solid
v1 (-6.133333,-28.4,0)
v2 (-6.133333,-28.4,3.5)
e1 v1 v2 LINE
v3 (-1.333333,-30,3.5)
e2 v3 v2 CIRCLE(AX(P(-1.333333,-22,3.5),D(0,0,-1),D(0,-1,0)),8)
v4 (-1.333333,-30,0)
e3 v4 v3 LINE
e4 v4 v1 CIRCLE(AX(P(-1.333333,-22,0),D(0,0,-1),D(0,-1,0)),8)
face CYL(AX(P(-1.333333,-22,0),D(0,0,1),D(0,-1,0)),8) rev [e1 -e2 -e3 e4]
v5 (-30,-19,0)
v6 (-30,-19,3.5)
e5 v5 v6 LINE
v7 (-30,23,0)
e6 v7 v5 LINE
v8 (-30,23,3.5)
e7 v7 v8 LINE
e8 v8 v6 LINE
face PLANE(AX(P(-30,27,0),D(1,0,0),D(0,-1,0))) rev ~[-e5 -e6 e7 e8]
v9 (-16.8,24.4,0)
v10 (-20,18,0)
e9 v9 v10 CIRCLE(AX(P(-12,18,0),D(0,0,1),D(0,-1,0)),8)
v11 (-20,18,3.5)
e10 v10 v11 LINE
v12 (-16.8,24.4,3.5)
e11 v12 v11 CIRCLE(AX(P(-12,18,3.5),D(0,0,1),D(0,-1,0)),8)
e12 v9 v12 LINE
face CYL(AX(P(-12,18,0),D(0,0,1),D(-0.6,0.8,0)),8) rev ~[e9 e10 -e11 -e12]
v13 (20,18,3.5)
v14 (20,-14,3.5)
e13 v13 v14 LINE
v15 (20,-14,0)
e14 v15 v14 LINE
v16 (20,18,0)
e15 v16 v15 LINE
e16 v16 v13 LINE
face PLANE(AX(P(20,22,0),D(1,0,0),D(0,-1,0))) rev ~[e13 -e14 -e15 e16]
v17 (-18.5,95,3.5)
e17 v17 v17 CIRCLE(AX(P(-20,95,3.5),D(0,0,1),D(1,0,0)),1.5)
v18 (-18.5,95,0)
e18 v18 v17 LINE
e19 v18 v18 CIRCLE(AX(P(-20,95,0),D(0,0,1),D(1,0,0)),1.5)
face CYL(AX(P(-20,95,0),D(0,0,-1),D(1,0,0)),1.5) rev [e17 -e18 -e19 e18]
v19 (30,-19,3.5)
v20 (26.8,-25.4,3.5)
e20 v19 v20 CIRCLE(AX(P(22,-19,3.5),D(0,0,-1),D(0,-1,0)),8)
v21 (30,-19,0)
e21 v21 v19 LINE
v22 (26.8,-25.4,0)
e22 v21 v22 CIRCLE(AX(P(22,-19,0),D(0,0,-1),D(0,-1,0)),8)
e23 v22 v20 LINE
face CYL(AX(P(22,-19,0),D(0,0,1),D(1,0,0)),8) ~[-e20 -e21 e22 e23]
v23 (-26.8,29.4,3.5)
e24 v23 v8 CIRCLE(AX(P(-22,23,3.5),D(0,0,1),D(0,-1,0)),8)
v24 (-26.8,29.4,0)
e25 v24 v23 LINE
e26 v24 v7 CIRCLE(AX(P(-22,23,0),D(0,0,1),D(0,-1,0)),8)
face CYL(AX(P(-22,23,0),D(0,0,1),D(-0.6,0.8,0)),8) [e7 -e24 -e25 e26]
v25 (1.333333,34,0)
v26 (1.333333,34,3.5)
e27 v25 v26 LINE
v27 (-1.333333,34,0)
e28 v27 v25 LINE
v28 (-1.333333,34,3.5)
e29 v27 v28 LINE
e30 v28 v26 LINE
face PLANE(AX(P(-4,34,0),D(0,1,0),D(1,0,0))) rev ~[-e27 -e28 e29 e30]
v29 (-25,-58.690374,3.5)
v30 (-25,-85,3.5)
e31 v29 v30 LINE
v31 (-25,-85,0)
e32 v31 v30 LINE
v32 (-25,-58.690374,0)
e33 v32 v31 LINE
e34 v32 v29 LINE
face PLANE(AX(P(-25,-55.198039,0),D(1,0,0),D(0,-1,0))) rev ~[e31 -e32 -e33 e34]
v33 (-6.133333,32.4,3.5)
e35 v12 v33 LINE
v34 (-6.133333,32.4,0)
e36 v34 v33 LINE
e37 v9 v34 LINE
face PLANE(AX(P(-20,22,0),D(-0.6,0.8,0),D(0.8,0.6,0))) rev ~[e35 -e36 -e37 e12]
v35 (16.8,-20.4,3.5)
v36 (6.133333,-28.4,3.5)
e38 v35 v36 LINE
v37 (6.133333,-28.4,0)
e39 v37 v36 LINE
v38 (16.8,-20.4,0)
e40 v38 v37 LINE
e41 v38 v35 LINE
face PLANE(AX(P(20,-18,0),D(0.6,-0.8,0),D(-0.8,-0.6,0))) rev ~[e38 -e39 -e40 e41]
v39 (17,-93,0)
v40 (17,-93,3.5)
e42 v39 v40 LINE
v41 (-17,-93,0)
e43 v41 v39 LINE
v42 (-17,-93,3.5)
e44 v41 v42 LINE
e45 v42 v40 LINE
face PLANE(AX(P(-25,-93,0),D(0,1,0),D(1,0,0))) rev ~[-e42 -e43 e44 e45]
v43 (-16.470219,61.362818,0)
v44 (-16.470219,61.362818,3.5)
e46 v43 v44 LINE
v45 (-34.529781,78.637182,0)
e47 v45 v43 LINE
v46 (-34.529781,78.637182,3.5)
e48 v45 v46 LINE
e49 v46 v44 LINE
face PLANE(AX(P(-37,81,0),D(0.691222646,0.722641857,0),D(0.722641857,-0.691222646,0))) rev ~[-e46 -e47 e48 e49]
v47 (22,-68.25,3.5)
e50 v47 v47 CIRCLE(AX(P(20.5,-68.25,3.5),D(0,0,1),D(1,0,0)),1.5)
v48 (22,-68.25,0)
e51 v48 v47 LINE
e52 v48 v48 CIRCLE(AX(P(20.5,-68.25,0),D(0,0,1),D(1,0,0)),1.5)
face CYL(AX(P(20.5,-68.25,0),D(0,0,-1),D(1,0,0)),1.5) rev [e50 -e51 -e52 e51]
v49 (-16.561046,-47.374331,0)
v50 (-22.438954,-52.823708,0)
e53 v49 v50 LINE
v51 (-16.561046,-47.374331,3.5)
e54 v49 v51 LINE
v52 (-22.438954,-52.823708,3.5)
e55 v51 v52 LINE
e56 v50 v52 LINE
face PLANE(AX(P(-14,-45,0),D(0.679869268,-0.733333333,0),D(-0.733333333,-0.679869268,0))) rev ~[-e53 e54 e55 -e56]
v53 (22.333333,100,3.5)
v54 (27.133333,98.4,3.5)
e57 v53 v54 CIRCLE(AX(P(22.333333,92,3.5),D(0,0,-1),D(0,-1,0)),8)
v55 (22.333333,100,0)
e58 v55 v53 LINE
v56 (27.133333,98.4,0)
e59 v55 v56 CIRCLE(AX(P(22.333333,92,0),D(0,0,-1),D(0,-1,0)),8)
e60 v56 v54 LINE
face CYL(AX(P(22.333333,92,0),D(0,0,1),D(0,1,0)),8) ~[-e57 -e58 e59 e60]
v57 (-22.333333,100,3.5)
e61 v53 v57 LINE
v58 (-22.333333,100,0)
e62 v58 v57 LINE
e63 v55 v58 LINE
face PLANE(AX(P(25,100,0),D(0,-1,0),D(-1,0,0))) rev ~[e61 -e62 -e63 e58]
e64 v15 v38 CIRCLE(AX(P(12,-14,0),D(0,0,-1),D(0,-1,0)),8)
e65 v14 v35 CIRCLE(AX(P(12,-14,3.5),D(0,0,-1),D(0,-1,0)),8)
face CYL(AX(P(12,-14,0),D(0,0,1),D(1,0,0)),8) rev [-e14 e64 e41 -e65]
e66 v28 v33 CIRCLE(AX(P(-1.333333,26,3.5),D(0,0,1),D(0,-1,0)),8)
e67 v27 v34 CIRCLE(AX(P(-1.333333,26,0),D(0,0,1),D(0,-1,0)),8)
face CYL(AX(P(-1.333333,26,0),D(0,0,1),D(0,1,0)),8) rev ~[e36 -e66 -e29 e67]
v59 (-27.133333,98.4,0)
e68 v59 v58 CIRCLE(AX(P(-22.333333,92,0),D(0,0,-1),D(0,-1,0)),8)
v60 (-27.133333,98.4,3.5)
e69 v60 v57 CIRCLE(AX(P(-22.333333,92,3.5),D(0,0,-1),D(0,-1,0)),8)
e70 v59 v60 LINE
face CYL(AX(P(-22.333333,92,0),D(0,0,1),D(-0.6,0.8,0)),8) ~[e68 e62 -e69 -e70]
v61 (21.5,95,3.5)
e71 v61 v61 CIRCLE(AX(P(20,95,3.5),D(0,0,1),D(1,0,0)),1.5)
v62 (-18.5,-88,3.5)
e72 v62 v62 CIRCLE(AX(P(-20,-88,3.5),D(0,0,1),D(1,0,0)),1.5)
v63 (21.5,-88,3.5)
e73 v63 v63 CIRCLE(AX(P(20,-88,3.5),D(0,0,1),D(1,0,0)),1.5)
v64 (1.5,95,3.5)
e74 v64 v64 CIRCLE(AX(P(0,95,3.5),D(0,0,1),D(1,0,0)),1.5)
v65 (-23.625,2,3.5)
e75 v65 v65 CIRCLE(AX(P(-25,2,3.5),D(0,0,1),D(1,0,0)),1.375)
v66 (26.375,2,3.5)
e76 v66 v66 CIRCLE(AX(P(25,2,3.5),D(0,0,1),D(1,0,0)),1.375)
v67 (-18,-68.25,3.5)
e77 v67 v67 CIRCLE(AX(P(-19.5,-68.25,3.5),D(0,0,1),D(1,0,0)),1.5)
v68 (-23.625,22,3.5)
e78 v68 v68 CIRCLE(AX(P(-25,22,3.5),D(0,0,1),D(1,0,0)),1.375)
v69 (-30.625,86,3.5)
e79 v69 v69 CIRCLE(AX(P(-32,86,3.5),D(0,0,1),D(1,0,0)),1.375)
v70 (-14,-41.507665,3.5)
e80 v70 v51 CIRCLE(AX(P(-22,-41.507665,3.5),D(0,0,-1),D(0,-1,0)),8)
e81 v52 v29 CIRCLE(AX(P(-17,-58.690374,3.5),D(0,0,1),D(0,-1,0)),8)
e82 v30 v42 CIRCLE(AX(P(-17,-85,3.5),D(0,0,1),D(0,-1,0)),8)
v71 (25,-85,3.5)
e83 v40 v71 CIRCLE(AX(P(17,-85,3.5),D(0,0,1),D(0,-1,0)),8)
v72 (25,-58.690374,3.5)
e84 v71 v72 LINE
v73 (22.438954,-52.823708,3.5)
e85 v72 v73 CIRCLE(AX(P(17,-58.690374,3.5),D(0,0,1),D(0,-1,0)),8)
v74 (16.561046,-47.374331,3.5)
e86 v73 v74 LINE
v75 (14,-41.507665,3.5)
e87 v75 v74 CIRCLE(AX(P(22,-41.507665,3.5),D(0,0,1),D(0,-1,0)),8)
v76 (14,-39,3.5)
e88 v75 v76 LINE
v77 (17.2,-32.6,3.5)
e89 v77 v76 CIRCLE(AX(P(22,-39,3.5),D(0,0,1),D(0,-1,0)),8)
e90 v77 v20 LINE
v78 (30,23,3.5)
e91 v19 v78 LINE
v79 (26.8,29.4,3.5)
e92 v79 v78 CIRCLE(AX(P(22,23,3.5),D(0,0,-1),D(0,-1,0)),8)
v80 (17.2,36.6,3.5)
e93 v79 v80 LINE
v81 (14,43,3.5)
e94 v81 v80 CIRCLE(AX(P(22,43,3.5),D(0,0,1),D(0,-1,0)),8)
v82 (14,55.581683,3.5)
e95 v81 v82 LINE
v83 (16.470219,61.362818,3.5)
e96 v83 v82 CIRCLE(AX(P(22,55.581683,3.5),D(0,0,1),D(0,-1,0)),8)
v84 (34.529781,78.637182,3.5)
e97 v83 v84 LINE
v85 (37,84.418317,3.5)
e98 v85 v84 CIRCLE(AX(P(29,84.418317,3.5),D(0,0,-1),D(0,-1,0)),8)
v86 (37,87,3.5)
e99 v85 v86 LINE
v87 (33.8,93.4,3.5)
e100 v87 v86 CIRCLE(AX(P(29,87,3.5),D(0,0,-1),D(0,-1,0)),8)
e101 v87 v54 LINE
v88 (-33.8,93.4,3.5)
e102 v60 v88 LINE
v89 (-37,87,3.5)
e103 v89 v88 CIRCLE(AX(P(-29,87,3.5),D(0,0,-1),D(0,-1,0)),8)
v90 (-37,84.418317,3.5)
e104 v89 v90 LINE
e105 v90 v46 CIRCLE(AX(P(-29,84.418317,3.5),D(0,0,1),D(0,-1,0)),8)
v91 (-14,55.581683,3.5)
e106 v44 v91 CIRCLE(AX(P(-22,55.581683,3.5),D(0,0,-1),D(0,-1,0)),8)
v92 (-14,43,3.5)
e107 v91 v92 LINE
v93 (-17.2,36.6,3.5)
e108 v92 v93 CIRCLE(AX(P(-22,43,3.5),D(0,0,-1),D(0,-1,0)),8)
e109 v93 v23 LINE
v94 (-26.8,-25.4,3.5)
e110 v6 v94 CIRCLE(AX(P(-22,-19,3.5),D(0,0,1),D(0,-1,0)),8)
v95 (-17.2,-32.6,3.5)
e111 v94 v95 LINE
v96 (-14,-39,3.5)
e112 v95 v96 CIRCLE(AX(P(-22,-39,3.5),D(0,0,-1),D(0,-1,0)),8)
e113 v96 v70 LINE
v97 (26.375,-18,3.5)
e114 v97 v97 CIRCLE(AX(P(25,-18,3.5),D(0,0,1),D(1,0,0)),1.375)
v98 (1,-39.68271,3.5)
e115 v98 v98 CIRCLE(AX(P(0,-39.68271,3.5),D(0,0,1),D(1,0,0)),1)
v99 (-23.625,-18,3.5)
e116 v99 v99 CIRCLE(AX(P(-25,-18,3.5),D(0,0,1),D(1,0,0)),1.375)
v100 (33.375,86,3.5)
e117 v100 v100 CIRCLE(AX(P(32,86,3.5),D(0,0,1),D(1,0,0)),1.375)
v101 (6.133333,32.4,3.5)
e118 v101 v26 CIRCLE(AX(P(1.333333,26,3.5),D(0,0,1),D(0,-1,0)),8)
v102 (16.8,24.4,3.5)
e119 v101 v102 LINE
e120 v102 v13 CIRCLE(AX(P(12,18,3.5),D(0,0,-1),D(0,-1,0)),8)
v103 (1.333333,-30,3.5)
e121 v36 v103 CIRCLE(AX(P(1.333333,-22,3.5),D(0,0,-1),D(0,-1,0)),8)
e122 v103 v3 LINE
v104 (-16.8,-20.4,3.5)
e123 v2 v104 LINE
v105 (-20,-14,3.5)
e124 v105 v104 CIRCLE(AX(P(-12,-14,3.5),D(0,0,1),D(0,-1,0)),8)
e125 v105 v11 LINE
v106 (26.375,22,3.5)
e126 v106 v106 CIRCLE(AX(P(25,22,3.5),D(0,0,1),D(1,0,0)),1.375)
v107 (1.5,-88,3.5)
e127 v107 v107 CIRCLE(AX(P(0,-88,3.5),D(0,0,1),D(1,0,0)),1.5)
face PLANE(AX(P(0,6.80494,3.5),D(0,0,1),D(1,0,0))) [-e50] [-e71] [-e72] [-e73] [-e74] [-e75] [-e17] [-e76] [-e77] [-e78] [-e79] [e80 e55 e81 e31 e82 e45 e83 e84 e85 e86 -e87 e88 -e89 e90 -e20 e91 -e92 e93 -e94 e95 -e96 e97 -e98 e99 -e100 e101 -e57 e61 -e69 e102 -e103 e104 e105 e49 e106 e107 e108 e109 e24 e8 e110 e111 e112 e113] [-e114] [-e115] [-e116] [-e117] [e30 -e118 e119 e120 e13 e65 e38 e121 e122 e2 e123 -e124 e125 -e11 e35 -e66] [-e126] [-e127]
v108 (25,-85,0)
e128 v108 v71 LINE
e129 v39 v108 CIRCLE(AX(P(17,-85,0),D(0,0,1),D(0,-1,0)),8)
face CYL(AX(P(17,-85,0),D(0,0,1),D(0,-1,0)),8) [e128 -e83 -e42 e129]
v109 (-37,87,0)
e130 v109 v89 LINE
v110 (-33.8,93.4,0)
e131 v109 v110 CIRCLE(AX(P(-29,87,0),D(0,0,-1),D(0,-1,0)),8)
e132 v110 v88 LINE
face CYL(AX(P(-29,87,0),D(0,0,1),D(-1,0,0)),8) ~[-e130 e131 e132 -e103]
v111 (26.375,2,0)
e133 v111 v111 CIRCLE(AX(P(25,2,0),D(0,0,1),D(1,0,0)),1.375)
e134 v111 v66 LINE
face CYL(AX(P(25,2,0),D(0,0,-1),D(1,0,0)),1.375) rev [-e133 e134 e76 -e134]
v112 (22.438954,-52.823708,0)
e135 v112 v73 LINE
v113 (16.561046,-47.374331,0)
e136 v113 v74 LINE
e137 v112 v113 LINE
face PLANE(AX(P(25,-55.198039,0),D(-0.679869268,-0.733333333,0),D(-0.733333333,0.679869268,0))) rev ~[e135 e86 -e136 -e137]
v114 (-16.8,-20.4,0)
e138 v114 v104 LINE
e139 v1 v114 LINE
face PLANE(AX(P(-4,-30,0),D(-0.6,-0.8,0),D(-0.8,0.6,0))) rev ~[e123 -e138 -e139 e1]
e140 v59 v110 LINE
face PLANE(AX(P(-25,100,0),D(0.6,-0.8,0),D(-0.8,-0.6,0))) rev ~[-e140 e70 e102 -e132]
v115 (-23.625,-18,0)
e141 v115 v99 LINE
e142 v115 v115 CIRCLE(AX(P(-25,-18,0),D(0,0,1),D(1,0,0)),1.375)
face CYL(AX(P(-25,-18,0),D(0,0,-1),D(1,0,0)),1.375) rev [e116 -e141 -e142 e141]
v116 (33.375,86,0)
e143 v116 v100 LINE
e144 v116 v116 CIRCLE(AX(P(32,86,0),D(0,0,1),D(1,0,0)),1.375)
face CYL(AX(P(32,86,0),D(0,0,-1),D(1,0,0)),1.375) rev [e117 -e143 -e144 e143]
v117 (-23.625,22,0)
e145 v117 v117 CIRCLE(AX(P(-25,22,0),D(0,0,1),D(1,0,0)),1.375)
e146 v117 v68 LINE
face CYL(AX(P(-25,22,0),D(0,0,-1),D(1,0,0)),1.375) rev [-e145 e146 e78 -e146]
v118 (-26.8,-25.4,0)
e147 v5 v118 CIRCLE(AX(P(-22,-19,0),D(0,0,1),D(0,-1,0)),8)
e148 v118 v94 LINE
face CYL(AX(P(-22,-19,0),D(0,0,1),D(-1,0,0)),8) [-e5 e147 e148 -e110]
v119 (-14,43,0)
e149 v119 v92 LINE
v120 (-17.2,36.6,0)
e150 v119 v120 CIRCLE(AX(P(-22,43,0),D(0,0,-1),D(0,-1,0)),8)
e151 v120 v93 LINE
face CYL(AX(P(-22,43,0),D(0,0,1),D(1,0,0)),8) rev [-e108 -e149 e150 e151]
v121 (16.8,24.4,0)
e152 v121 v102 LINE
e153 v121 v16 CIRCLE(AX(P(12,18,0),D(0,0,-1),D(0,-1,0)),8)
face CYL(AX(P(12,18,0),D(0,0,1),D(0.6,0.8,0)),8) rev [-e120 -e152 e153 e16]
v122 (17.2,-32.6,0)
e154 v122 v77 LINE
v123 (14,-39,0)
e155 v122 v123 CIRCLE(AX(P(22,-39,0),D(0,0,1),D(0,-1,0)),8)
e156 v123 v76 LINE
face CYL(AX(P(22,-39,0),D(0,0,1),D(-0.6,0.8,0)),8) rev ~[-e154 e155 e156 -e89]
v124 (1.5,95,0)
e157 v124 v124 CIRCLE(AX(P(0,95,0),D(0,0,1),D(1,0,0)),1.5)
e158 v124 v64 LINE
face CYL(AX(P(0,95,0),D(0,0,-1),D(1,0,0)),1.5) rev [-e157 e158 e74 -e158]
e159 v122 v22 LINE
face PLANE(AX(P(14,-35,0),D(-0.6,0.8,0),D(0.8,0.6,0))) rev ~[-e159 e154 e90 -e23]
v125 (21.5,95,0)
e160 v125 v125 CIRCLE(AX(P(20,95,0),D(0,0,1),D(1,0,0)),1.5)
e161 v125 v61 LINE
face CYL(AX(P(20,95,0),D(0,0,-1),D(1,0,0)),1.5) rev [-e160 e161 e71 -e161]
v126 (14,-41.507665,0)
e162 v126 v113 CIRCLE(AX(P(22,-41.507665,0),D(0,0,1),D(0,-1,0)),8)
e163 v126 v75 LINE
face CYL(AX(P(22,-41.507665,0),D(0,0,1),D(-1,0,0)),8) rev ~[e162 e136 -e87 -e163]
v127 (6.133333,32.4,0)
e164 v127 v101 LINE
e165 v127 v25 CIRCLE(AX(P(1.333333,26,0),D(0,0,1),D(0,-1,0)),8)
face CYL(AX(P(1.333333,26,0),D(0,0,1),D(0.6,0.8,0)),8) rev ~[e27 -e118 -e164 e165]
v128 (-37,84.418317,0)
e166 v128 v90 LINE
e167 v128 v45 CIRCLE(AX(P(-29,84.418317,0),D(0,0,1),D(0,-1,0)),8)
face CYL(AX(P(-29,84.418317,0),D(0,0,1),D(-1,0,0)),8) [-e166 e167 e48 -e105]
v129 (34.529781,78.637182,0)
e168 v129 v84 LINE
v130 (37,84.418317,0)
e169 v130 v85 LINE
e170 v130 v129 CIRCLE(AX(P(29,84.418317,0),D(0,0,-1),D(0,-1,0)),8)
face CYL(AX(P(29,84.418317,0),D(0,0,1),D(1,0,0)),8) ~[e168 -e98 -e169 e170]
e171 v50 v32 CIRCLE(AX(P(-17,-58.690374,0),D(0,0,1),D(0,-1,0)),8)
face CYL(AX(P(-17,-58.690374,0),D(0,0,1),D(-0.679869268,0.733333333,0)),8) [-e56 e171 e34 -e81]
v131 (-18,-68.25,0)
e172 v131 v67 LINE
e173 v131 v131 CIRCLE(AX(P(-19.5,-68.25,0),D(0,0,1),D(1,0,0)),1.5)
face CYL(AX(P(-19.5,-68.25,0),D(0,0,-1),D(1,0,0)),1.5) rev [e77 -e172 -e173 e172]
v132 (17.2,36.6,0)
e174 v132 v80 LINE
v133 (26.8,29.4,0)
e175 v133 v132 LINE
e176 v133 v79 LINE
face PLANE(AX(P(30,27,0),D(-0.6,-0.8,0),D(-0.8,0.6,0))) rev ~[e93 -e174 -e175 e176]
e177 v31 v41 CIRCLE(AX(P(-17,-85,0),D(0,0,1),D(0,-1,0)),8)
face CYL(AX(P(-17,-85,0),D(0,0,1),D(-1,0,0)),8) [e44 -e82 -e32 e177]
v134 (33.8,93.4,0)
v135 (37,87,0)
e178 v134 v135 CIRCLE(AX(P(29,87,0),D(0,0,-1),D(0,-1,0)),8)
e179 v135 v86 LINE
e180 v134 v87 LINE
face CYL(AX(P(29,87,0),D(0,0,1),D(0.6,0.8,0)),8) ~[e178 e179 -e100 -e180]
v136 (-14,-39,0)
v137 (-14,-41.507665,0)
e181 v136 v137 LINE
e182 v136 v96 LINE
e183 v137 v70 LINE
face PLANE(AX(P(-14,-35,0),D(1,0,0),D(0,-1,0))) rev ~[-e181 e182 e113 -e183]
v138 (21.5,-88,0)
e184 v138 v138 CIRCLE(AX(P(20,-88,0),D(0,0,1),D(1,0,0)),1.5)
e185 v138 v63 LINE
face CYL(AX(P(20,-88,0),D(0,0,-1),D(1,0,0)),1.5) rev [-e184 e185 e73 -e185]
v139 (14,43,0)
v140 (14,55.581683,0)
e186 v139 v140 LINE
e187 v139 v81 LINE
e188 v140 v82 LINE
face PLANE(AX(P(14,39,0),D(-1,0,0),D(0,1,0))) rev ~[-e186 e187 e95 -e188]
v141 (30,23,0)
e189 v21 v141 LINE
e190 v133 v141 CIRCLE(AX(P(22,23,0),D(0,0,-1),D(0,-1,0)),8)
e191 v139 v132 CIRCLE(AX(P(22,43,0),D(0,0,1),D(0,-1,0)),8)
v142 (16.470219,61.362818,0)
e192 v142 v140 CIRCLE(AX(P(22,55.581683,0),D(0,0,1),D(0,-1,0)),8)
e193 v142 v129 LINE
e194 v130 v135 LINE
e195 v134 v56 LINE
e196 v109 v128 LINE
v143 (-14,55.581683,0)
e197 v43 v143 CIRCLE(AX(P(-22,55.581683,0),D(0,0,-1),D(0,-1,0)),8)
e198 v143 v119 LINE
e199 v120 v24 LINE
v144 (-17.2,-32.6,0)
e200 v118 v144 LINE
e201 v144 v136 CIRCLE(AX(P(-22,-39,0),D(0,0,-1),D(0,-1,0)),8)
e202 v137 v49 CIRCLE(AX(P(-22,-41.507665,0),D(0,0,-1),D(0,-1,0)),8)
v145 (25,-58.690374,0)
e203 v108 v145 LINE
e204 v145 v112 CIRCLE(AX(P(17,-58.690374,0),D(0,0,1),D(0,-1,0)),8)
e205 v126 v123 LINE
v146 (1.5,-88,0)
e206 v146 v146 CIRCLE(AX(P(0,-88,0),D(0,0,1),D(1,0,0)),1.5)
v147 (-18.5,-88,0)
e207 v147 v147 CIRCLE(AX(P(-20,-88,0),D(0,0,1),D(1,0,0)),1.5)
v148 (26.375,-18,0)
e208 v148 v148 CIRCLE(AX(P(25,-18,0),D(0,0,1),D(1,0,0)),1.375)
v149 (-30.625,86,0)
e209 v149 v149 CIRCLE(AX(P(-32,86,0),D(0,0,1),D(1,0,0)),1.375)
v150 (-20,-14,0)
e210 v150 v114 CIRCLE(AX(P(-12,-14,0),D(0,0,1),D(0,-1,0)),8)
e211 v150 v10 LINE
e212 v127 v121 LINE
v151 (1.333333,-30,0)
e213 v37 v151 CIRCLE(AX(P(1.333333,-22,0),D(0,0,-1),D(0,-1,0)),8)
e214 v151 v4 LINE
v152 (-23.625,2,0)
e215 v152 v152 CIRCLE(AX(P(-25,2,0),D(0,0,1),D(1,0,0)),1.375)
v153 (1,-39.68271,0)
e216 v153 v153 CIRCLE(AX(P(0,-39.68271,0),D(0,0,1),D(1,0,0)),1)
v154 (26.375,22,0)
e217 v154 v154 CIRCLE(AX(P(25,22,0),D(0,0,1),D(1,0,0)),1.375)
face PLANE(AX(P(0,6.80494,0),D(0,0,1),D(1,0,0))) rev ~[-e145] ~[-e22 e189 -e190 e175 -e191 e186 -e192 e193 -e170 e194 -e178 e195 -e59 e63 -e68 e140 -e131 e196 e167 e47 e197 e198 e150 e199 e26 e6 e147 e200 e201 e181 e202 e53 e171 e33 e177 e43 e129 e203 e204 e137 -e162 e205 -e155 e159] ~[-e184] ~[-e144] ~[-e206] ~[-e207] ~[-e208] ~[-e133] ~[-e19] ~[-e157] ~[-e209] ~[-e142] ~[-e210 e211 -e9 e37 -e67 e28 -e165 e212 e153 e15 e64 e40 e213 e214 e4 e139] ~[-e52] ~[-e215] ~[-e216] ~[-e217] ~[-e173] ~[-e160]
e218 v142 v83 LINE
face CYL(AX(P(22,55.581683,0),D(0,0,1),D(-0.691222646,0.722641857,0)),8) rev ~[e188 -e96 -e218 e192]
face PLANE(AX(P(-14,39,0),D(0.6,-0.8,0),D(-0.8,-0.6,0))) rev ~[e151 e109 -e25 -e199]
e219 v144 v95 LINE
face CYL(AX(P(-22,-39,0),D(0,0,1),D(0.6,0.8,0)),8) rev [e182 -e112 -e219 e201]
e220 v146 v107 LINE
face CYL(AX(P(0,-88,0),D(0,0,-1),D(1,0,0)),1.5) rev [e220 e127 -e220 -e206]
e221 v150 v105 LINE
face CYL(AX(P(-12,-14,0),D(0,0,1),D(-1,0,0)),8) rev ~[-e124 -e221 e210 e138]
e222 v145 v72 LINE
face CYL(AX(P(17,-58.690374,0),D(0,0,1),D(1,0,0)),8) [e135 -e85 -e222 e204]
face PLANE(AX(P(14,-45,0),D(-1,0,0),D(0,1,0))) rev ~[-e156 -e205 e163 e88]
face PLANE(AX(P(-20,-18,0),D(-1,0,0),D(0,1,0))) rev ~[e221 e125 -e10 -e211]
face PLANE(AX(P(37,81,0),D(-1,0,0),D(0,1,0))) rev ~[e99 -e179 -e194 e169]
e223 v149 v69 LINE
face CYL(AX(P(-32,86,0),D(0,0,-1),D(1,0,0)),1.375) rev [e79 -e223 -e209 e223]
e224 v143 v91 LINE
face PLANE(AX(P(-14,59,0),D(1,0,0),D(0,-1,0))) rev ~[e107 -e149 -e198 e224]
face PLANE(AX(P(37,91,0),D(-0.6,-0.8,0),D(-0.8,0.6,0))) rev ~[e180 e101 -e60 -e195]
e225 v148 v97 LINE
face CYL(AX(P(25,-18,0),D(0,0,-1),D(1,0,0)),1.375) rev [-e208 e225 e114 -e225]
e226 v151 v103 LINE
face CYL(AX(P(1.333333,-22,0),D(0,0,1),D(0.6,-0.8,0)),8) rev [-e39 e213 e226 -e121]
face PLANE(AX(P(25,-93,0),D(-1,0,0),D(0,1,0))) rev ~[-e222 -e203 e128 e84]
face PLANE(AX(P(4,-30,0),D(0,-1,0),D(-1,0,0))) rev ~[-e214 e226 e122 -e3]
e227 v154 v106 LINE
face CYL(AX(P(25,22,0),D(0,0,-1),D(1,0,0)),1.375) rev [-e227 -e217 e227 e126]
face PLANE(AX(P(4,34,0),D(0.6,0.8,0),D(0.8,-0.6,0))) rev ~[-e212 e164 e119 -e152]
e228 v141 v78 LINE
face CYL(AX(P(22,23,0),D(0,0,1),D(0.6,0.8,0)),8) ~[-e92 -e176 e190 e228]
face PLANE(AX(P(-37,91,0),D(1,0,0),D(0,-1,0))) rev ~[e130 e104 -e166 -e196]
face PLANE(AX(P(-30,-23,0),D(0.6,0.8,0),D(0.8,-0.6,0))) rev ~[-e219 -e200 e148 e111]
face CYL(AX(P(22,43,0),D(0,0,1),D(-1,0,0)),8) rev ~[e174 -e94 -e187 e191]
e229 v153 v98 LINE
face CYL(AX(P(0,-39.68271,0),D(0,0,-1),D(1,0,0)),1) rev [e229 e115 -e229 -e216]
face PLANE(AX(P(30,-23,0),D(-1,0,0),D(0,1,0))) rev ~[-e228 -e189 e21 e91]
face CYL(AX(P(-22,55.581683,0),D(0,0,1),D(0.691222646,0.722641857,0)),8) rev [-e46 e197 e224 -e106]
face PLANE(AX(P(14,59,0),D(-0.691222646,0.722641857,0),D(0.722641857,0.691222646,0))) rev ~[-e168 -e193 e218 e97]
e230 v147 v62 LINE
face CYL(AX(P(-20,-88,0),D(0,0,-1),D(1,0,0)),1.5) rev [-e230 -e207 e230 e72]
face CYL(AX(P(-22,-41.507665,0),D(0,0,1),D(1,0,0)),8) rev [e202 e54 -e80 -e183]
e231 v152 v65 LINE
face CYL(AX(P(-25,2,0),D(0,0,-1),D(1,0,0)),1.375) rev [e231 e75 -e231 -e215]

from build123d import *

# Parameters (mm, degrees)
F0_R     = 1.5
F0_R_2   = 1.375
F0_R_3   = 1
F1_DEPTH = 3.5
F2_R     = 8


# Not quite as in the source:
# - a feature names something its author has since deleted; it is built from what else it names


with BuildPart() as f1:
    # F0 (on Top) → F1 (new body)
    with BuildSketch(Plane.XY):
        Polygon((-37, 91), (-37, 81), (-14, 59), (-14, 39), (-30, 27), (-30, -23), (-14, -35), (-14, -45), (-25, -55.1980390272), (-25, -93), (25, -93), (25, -55.1980390272), (14, -45), (14, -35), (30, -23), (30, 27), (14, 39), (14, 59), (37, 81), (37, 91), (25, 100), (-25, 100), align=None)
        with Locations((-20, -88)):
            Circle(F0_R, mode=Mode.SUBTRACT)
        with Locations((-19.5, -68.25)):
            Circle(F0_R, mode=Mode.SUBTRACT)
        with Locations((-25, -18)):
            Circle(F0_R_2, mode=Mode.SUBTRACT)
        with Locations((-25, 2)):
            Circle(F0_R_2, mode=Mode.SUBTRACT)
        with Locations((0, -88)):
            Circle(F0_R, mode=Mode.SUBTRACT)
        with Locations((20, -88)):
            Circle(F0_R, mode=Mode.SUBTRACT)
        with Locations((20.5, -68.25)):
            Circle(F0_R, mode=Mode.SUBTRACT)
        with Locations((25, -18)):
            Circle(F0_R_2, mode=Mode.SUBTRACT)
        with Locations((25, 2)):
            Circle(F0_R_2, mode=Mode.SUBTRACT)
        with Locations((-25, 22)):
            Circle(F0_R_2, mode=Mode.SUBTRACT)
        with Locations((-32, 86)):
            Circle(F0_R_2, mode=Mode.SUBTRACT)
        with Locations((-20, 95)):
            Circle(F0_R, mode=Mode.SUBTRACT)
        Polygon((27, 86), (27, 85.2728960546), (4, 63.2728960546), (4, 34), (20, 22), (20, -18), (4, -30), (4, -49.3654190662), (15, -59.5634580934), (15, -83), (-15, -83), (-15, -59.5634580934), (-4, -49.3654190662), (-4, -30), (-20, -18), (-20, 22), (-4, 34), (-4, 63.2728960546), (-27, 85.2728960546), (-27, 86), (-21.6666666667, 90), (21.6666666667, 90), align=None, mode=Mode.SUBTRACT)
        with Locations((25, 22)):
            Circle(F0_R_2, mode=Mode.SUBTRACT)
        with Locations((0, 95)):
            Circle(F0_R, mode=Mode.SUBTRACT)
        with Locations((20, 95)):
            Circle(F0_R, mode=Mode.SUBTRACT)
        with Locations((32, 86)):
            Circle(F0_R_2, mode=Mode.SUBTRACT)
        Polygon((4, 63.2728960546), (27, 85.2728960546), (27, 86), (21.6666666667, 90), (-21.6666666667, 90), (-27, 86), (-27, 85.2728960546), (-4, 63.2728960546), (-4, 34), (4, 34), align=None)
        Polygon((4, -49.3654190662), (4, -30), (-4, -30), (-4, -49.3654190662), (-15, -59.5634580934), (-15, -83), (15, -83), (15, -59.5634580934), align=None)
        with Locations((0, -39.6827095331)):
            Circle(F0_R_3, mode=Mode.SUBTRACT)
    extrude(amount=F1_DEPTH)

    # F2
    f2_edges = [f1.edges().sort_by_distance(p)[0] for p in [
        (4, -30, 1.75),
        (-4, -30, 1.75),
        (20, -18, 1.75),
        (-25, -93, 1.75),
        (25, -93, 1.75),
        (25, -55.198039, 1.75),
        (14, -45, 1.75),
        (-25, -55.198039, 1.75),
        (-14, -45, 1.75),
        (-14, -35, 1.75),
        (14, -35, 1.75),
        (30, -23, 1.75),
        (-30, -23, 1.75),
        (-20, -18, 1.75),
        (-20, 22, 1.75),
        (20, 22, 1.75),
        (4, 34, 1.75),
        (-4, 34, 1.75),
        (-30, 27, 1.75),
        (-14, 39, 1.75),
        (30, 27, 1.75),
        (14, 39, 1.75),
        (-14, 59, 1.75),
        (14, 59, 1.75),
        (37, 81, 1.75),
        (37, 91, 1.75),
        (25, 100, 1.75),
        (-25, 100, 1.75),
        (-37, 81, 1.75),
        (-37, 91, 1.75),
    ]]
    fillet(f2_edges, radius=F2_R)


solid = f1.part
